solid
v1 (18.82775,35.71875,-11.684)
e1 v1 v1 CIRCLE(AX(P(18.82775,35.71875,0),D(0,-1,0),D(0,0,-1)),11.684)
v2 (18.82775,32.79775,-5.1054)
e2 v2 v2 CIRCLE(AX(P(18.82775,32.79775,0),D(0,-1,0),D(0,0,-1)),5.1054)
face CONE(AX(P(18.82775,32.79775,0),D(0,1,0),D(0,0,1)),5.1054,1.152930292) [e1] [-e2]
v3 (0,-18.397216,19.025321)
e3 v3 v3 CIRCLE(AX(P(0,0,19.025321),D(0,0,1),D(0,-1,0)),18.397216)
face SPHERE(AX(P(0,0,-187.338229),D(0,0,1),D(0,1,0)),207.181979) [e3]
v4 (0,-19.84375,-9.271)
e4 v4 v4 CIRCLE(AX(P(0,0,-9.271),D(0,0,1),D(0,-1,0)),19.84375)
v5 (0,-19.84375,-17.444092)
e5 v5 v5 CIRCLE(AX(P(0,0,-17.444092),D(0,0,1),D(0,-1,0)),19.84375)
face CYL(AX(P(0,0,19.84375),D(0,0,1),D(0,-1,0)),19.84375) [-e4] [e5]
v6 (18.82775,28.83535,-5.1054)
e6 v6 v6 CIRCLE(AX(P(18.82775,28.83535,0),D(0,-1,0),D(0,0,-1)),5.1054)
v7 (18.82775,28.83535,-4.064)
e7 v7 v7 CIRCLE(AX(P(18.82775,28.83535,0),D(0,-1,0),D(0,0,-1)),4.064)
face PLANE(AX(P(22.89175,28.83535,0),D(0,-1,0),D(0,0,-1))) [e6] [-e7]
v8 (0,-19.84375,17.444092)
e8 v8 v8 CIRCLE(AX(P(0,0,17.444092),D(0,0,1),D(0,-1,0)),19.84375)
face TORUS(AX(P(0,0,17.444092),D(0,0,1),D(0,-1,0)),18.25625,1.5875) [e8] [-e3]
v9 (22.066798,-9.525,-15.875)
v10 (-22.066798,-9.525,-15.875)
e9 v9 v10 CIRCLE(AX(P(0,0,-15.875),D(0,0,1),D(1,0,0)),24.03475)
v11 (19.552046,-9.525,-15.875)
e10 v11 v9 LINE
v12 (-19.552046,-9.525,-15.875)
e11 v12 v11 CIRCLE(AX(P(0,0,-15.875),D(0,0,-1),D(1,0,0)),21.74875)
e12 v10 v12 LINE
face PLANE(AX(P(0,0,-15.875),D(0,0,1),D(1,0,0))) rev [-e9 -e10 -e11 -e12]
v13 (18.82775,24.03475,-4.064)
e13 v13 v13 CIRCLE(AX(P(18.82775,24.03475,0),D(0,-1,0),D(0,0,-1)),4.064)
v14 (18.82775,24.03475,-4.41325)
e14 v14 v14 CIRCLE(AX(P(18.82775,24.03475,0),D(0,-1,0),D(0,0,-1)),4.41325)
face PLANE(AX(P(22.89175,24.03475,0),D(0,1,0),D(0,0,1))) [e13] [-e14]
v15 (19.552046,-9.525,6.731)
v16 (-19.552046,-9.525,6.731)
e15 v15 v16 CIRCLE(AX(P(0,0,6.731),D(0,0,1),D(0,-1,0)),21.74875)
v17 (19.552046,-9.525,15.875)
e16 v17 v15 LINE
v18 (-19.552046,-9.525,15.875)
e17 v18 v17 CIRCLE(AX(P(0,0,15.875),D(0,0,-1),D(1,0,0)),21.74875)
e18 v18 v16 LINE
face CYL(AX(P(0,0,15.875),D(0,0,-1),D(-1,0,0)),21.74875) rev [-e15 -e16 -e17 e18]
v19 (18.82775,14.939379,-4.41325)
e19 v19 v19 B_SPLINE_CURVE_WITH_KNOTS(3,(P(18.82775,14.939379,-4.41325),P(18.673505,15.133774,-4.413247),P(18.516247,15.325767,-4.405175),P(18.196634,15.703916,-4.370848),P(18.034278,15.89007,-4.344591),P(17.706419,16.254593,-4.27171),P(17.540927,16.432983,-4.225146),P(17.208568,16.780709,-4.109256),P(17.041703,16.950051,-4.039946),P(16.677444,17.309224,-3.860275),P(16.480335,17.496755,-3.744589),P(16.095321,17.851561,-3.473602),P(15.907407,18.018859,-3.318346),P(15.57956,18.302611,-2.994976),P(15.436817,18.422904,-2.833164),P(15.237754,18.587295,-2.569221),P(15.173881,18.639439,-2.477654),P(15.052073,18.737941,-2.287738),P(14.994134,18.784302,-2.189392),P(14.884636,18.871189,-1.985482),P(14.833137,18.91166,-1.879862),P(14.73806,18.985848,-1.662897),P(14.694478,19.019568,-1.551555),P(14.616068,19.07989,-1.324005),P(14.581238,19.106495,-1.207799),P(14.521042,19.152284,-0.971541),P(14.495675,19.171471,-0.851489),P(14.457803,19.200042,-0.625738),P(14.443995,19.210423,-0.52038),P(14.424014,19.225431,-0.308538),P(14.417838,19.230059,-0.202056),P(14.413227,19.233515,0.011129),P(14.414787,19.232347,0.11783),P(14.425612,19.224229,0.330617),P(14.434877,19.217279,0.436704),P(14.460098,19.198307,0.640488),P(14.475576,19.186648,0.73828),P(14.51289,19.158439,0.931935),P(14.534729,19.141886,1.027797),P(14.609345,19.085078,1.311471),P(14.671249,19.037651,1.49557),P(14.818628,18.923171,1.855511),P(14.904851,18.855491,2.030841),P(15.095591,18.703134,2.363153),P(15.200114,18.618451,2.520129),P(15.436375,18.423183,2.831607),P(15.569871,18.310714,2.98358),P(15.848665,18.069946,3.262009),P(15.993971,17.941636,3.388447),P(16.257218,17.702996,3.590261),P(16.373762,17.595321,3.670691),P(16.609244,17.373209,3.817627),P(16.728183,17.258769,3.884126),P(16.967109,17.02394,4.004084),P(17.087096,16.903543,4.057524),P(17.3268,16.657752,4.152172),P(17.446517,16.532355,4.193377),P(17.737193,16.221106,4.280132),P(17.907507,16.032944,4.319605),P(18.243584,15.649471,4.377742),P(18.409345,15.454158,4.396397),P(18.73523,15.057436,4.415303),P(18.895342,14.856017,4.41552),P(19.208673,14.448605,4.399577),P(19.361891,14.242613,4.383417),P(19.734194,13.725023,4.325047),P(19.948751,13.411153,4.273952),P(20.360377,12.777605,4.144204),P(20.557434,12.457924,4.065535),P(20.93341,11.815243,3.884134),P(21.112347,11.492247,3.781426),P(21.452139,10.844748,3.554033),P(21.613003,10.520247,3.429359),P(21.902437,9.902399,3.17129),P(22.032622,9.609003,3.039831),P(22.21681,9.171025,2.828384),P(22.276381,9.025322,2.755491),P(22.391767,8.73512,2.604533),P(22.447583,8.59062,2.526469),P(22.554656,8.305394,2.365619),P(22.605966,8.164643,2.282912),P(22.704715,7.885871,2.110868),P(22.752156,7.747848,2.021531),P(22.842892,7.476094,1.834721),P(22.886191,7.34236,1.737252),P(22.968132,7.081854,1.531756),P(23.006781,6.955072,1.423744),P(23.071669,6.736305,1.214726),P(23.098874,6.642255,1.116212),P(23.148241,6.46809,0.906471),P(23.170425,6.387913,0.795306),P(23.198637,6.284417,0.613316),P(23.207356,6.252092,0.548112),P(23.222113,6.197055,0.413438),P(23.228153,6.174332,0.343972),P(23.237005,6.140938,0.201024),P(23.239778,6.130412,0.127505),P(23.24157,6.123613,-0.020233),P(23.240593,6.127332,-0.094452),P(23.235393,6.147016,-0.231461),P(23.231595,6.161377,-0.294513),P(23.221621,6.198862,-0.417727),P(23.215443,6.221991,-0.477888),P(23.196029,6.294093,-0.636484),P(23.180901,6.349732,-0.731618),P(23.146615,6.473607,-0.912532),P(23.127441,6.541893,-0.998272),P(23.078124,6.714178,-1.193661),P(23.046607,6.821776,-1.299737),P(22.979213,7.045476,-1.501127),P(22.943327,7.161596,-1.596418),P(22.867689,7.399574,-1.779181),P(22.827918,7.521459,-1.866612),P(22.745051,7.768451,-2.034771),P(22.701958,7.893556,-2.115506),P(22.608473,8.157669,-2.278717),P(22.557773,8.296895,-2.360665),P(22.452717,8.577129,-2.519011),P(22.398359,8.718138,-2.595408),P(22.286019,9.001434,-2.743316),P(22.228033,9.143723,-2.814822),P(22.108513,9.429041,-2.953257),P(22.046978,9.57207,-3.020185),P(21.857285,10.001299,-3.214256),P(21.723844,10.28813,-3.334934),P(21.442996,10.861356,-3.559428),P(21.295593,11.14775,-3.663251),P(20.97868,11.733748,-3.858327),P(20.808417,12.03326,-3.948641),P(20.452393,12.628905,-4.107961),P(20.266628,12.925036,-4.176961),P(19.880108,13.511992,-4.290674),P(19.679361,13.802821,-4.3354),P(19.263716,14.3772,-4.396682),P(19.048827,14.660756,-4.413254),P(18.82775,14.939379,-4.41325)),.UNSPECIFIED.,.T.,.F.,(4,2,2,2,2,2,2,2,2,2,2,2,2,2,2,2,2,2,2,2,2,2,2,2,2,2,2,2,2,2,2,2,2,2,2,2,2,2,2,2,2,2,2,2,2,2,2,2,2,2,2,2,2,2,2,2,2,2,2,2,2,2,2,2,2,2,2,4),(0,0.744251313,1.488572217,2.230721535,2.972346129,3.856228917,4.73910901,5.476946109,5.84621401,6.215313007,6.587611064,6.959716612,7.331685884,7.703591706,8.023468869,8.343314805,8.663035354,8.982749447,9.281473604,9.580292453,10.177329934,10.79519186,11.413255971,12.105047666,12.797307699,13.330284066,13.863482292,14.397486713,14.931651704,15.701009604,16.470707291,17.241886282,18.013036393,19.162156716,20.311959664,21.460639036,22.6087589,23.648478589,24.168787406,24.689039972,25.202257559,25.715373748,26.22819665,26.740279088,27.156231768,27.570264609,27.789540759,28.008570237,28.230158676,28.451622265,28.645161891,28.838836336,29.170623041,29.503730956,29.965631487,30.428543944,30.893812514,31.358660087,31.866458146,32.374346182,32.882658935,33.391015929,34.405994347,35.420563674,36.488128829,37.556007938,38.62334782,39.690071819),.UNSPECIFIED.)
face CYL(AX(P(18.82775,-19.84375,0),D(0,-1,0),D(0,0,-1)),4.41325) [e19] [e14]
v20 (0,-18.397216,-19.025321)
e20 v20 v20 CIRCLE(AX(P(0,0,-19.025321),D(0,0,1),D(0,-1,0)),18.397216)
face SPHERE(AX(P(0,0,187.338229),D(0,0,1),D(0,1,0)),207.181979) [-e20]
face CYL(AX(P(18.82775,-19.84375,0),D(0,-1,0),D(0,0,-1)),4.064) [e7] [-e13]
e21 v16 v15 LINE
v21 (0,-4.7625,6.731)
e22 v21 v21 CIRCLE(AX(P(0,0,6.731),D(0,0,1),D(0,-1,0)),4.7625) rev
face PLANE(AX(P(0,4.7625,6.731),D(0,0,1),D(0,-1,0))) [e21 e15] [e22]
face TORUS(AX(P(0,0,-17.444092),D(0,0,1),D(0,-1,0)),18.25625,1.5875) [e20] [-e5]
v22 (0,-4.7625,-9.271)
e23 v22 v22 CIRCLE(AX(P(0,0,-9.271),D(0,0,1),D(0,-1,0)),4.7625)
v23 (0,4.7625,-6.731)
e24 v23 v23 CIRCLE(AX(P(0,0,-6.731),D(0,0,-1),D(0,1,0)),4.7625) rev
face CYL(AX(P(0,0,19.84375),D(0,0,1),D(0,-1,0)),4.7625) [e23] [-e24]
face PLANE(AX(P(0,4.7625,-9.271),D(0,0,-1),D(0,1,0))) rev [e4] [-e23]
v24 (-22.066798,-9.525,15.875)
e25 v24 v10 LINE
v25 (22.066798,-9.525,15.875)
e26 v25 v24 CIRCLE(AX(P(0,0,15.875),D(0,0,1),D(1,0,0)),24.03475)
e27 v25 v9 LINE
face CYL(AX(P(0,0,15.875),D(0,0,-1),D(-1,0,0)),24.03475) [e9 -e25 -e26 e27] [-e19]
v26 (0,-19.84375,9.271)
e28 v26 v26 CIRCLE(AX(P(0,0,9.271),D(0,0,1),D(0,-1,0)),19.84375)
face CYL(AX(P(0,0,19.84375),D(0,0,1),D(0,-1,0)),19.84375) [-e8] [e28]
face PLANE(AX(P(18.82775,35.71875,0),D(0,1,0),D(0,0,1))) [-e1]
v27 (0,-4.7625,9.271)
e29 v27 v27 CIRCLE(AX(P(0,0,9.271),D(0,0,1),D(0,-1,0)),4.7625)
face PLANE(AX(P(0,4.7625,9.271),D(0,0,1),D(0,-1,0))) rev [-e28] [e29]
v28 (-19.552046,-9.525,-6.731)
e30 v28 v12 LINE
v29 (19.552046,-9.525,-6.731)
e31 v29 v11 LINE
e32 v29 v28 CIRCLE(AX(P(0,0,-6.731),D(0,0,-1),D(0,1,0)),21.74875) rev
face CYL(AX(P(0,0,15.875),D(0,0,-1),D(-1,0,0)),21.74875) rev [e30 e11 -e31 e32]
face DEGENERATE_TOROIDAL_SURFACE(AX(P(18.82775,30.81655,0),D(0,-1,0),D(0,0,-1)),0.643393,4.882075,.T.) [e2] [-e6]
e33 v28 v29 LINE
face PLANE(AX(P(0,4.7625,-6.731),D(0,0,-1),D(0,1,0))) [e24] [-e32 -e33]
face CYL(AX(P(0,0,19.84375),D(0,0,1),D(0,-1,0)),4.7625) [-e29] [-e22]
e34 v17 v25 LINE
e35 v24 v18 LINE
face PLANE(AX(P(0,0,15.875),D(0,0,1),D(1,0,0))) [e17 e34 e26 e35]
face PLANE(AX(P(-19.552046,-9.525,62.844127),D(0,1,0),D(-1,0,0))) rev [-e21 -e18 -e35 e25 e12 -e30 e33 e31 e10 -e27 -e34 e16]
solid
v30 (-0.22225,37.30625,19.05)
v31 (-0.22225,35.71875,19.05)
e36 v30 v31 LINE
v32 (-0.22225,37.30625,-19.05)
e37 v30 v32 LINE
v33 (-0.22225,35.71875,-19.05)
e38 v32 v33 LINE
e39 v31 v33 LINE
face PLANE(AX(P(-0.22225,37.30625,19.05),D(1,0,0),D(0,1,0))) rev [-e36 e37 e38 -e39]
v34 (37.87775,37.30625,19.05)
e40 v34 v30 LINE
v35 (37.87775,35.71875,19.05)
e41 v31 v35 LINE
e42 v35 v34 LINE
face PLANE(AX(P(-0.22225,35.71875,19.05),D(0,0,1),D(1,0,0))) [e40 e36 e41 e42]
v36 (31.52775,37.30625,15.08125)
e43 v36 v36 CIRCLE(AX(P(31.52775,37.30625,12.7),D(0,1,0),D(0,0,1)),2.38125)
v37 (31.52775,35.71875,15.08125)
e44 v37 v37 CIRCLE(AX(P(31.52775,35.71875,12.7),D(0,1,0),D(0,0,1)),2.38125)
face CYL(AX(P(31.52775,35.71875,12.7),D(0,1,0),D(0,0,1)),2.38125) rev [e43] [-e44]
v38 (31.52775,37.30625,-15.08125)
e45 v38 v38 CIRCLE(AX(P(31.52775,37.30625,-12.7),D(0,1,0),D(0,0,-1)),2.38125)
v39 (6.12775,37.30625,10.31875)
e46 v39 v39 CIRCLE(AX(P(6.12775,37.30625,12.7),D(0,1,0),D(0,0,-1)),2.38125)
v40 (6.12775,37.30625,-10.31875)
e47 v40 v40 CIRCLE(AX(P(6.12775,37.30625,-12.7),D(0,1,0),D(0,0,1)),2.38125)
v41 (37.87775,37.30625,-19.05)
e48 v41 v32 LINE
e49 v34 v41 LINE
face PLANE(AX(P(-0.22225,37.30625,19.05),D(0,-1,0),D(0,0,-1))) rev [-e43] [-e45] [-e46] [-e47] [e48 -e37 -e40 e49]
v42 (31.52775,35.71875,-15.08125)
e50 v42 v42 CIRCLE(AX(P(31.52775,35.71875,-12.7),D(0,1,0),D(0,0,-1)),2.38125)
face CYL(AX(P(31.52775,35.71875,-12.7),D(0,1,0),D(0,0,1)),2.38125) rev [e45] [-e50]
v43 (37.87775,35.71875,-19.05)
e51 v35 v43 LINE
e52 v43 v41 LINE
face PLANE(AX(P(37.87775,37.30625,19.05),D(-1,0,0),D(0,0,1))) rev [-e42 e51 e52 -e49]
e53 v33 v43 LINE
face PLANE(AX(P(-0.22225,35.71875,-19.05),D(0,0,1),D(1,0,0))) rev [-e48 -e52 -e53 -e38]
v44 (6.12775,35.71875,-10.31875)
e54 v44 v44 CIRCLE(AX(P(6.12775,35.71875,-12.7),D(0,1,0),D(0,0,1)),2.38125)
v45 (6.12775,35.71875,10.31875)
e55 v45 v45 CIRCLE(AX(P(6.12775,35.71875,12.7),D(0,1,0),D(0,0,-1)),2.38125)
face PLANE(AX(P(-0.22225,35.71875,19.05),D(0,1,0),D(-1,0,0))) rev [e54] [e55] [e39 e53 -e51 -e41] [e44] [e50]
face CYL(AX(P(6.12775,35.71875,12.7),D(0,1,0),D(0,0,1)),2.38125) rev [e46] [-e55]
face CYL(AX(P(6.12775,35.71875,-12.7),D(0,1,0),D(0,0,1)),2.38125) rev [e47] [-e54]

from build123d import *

# Parameters (mm, degrees)
SKETCH16_W          = 38.1
SKETCH16_H          = 1.5875
BOSS_EXTRUDE1_DEPTH = 19.05
SKETCH18_R          = 2.38125
PLATE_2_HOLES_DEPTH = 43.428134549
EXTRUDE1_DEPTH      = 15.875
EXTRUDE7_START      = -20.288251886
EXTRUDE7_DEPTH      = 8.826501886
EXTRUDE2_DEPTH      = 6.731
EXTRUDE2_DEPTH_BACK = 6.731


# Read off the part's stored shape, not the designer's step: Extrude7
with BuildPart() as part:
    # Sketch16 → Boss-Extrude1 (new, symmetric)
    with BuildSketch(Plane.XY):
        with Locations((18.82775, 36.5125)):
            Rectangle(SKETCH16_W, SKETCH16_H)
    extrude(amount=BOSS_EXTRUDE1_DEPTH, both=True)

    # Sketch18 → Plate 2 holes (cut, through all)
    with BuildSketch(Plane(origin=(0, 37.30625, 0), x_dir=(1, 0, 0), z_dir=(0, 1, 0))):
        with Locations(Location((6.12775, 12.7, 0), (0, 0, 270))):
            Circle(SKETCH18_R)
        with Locations(Location((31.52775, 12.7, 0), (0, 0, 90))):
            Circle(SKETCH18_R)
        with Locations(Location((31.52775, -12.7, 0), (0, 0, 270))):
            Circle(SKETCH18_R)
        with Locations(Location((6.12775, -12.7, 0), (0, 0, 90))):
            Circle(SKETCH18_R)
    extrude(amount=-PLATE_2_HOLES_DEPTH, mode=Mode.SUBTRACT)


with BuildPart() as body_2:
    # Sketch2 → Revolve1 (revolve)
    with BuildSketch(Plane(origin=(0, 0, 0), x_dir=(0, 0, -1), z_dir=(1, 0, 0)), mode=Mode.PRIVATE) as revolve1_sk:
        with BuildLine():
            Line((-9.271, 4.7625), (-9.271, 19.84375))
            Line((-9.271, 19.84375), (-17.444092335, 19.84375))
            ThreePointArc((-17.444092335, 19.84375), (-18.51562698, 19.427561126), (-19.025321251, 18.397215832))
            ThreePointArc((-19.025321251, 18.397215832), (-19.639041681, 9.207705686), (-19.84375, 0))
            Line((-19.84375, 0), (0, 0))
            Line((0, 0), (19.84375, 0))
            ThreePointArc((19.84375, 0), (19.639041681, 9.207705686), (19.025321251, 18.397215832))
            ThreePointArc((19.025321251, 18.397215832), (18.51562698, 19.427561126), (17.444092335, 19.84375))
            Line((17.444092335, 19.84375), (9.271, 19.84375))
            Line((9.271, 19.84375), (9.271, 4.7625))
            Line((9.271, 4.7625), (-9.271, 4.7625))
        make_face()
    revolve(revolve1_sk.sketch.rotate(Axis((0, 0, 19.84375), (0, 0, -1)), 180), axis=Axis((0, 0, 19.84375), (0, 0, -1)))


with BuildPart() as body_3:
    # Sketch5 → Extrude1 (new, symmetric)
    with BuildSketch(Plane.XY):
        with BuildLine():
            Line((-22.066798195, -9.525), (-19.552045969, -9.525))
            ThreePointArc((-19.552045969, -9.525), (0, 21.74875), (19.552045969, -9.525))
            Line((19.552045969, -9.525), (22.066798195, -9.525))
            ThreePointArc((22.066798195, -9.525), (0, 24.03475), (-22.066798195, -9.525))
        make_face()
    extrude(amount=EXTRUDE1_DEPTH, both=True)


with BuildPart() as body_4:
    # Sketch7 → Revolve3 (revolve)
    with BuildSketch(Plane.XY, mode=Mode.PRIVATE) as revolve3_sk:
        with BuildLine():
            Line((18.82775, 35.71875), (18.82775, 0))
            Line((18.82775, 0), (23.241, 0))
            Line((23.241, 0), (23.241, 24.03475))
            Line((23.241, 24.03475), (22.89175, 24.03475))
            Line((22.89175, 24.03475), (22.89175, 28.83535))
            Line((22.89175, 28.83535), (23.93315, 28.83535))
            ThreePointArc((23.93315, 28.83535), (24.353218373, 30.81655), (23.93315, 32.79775))
            Line((23.93315, 32.79775), (30.51175, 35.71875))
            Line((30.51175, 35.71875), (18.82775, 35.71875))
        make_face()
    revolve(revolve3_sk.sketch.rotate(Axis((18.82775, -19.84375, 0), (0, 1, 0)), 90), axis=Axis((18.82775, -19.84375, 0), (0, 1, 0)))

    # Extrude7 outline → Extrude7 (cut)
    with BuildSketch(Plane.XY.offset(15.875).offset(EXTRUDE7_START)):
        with BuildLine():
            ThreePointArc((21.74875, 0), (19.830338976, 8.931169166), (14.413543823, 16.286739422))
            Line((14.413543823, 16.286739422), (13, 17.537706562))
            Line((13, 17.537706562), (13, 0))
            Line((13, 0), (21.74875, 0))
        make_face()
    extrude(amount=EXTRUDE7_DEPTH, mode=Mode.SUBTRACT)

    # Sketch8 → Extrude2 (add, two sides: drawn at the far end of the back side and taken through both)
    with BuildSketch(Plane.XY.offset(-EXTRUDE2_DEPTH_BACK)):
        with BuildLine():
            Line((-19.552045969, -9.525), (19.552045969, -9.525))
            ThreePointArc((19.552045969, -9.525), (0, 21.74875), (-19.552045969, -9.525))
        make_face()
    extrude(amount=EXTRUDE2_DEPTH + EXTRUDE2_DEPTH_BACK)

    # Combine1: union body 3, body 2
    add(body_3.part)
    add(body_2.part)


solid = Compound([part.part, body_4.part])
